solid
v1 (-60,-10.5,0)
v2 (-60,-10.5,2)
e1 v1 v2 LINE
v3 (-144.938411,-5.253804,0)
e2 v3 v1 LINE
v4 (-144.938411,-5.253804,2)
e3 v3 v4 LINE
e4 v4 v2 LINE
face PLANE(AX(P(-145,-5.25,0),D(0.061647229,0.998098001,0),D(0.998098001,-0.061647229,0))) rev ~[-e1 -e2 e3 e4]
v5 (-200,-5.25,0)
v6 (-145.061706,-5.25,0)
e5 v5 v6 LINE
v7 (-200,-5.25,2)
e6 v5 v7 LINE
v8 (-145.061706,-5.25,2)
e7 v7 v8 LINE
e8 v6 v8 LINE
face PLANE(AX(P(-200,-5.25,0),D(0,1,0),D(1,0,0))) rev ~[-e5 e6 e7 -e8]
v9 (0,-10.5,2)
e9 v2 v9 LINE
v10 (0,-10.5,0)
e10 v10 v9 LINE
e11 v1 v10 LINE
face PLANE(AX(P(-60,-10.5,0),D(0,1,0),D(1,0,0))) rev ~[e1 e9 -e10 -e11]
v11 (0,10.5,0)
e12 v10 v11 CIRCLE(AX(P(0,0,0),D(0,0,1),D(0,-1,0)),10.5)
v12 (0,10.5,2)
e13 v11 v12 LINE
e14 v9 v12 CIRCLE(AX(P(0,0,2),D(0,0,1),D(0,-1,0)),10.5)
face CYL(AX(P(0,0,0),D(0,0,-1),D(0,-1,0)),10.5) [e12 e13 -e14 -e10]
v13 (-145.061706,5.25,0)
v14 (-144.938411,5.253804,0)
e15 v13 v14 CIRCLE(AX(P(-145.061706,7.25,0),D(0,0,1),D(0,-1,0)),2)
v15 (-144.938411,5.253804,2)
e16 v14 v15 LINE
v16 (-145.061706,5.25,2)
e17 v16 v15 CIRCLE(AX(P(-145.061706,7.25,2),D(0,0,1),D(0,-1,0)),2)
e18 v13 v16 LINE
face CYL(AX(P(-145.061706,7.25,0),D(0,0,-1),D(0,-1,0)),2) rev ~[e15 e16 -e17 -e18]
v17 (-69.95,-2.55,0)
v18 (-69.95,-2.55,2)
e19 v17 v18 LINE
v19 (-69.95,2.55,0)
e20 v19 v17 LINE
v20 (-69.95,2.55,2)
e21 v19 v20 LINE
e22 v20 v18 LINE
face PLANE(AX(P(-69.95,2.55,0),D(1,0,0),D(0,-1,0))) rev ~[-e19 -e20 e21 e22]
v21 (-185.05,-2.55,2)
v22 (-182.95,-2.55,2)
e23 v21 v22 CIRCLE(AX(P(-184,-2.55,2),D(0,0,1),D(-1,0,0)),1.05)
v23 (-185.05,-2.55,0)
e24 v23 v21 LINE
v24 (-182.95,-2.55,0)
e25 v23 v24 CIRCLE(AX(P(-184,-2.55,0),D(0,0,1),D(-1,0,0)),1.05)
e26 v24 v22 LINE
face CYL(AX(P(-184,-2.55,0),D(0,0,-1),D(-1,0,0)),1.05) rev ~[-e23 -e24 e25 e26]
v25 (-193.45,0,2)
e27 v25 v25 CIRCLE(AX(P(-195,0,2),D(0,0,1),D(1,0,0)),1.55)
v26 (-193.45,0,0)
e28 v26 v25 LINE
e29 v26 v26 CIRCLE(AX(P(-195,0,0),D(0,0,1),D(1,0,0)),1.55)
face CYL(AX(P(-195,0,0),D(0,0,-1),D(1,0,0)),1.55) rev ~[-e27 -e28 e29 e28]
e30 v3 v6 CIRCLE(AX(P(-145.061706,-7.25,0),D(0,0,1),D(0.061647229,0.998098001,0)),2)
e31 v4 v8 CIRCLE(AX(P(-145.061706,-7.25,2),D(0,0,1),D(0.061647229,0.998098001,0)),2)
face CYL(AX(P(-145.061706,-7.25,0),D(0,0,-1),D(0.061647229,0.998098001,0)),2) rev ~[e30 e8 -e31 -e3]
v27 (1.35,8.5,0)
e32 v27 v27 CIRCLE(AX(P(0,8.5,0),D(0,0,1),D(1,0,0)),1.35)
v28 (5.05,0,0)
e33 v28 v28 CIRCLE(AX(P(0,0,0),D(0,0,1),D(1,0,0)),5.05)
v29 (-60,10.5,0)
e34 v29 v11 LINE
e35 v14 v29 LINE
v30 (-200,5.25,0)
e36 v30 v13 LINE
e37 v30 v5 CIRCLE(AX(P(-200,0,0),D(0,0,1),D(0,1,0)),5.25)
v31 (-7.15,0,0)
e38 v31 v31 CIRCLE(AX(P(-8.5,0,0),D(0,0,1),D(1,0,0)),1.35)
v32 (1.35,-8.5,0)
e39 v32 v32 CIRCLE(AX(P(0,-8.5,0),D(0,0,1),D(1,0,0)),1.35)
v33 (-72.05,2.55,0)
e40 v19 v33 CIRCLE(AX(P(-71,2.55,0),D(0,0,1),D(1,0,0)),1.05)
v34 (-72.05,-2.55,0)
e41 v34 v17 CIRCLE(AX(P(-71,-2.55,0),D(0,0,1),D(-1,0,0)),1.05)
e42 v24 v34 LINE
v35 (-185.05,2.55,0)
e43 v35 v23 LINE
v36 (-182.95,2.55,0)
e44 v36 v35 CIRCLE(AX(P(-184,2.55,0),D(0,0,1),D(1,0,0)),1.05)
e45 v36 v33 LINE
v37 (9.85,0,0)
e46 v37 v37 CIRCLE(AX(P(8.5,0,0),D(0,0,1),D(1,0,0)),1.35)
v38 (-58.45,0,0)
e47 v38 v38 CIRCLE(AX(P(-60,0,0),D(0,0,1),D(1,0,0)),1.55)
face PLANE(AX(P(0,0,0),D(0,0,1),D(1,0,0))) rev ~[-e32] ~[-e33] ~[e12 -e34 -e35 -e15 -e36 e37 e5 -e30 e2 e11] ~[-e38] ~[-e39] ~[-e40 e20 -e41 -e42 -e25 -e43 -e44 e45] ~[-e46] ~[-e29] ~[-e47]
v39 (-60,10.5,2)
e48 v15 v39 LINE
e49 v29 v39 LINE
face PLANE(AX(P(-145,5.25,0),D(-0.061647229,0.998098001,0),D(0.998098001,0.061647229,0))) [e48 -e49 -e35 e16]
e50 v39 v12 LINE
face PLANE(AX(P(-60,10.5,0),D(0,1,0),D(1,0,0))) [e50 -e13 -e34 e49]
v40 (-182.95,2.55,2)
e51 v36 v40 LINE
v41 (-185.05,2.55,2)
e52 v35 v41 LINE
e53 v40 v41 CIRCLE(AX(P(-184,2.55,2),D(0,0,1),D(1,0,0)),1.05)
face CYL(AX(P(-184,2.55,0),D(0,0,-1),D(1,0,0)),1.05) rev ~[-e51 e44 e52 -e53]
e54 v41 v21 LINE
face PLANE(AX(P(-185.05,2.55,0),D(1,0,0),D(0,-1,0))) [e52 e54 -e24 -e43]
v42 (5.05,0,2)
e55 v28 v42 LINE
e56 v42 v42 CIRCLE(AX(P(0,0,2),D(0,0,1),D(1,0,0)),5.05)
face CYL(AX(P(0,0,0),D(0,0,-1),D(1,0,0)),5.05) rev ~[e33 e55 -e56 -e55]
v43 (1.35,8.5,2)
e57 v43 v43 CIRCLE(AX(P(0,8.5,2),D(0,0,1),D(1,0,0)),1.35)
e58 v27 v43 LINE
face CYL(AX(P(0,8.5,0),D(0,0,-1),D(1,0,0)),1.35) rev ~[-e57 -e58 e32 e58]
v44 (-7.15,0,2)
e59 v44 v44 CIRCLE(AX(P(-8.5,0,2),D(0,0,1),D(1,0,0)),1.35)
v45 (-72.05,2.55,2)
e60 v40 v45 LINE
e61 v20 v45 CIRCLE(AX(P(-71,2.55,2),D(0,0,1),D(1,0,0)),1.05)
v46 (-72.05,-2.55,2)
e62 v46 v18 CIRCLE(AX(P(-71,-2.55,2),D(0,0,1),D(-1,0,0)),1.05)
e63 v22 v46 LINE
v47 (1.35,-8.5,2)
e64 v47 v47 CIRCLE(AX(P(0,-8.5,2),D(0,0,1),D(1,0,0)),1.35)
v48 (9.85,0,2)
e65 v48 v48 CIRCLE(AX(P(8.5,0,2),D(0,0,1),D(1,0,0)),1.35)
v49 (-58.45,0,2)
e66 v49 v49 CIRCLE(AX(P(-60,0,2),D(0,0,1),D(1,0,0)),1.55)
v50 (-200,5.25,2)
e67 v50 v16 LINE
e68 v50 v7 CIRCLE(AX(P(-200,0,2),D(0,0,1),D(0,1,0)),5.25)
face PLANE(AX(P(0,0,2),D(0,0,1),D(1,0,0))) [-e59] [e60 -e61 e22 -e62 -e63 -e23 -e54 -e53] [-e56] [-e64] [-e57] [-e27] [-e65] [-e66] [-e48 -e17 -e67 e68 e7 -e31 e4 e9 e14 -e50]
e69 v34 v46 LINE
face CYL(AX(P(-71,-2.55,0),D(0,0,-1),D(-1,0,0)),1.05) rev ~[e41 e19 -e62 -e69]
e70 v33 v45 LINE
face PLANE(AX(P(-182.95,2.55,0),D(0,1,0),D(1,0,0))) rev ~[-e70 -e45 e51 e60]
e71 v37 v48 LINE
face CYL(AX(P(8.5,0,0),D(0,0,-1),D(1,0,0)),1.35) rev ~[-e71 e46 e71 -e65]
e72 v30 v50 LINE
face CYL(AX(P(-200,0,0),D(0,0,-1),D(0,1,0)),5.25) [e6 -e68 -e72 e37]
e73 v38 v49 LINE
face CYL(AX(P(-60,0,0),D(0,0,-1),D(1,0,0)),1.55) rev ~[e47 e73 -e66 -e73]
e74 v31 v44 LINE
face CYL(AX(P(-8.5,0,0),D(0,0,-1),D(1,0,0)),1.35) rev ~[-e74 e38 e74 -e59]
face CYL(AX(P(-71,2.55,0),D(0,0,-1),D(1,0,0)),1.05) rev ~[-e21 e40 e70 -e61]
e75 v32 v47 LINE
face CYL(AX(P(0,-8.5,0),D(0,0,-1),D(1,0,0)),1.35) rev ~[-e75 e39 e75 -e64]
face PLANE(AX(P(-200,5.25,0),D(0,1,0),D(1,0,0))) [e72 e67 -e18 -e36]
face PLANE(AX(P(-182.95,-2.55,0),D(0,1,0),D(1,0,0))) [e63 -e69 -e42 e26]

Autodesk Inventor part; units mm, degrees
ref_plane "YZ Plane" through (0, 0, 0) normal (1, 0, 0) x (0, 1, 0)
ref_plane "XZ Plane" through (0, 0, 0) normal (0, 1, 0) x (-1, 0, 0)
ref_plane "XY Plane" through (0, 0, 0) normal (0, 0, 1) x (1, 0, 0)
sketch "スケッチ1" plane through (0, 0, 0) normal (0, 0, 1) x (1, 0, 0)
  circle A0 centre (0, 0) radius 10.5 construction
  line L0 (0, 10.5) -> (-200, 10.5) construction
  line L1 (-200, 10.5) -> (-200, -10.5) construction
  line L2 (-200, -10.5) -> (0, -10.5) construction
  circle A1 centre (-195, 0) radius 1.55
  line L3 (-185, 2.5) -> (-70, 2.5) construction
  line L4 (-70, 2.5) -> (-70, -2.5) construction
  line L5 (-70, -2.5) -> (-185, -2.5) construction
  line L6 (-185, -2.5) -> (-185, 2.5) construction
  line L7 (-127.5, 2.5) -> (-127.5, -2.5) construction
  circle A2 centre (-60, 0) radius 1.55
  line L8 (-12, 21.3027) -> (-12, -27.3903) construction
  line L9 (-69.95, 2.55) -> (-185.05, 2.55) construction
  line L10 (-185.05, 2.55) -> (-185.05, -2.55) construction
  line L11 (-185.05, -2.55) -> (-69.95, -2.55) construction
  line L12 (-69.95, -2.55) -> (-69.95, 2.55) construction
  circle A3 centre (-184, 2.55) radius 1.05 construction
  line L13 (-185, 0) -> (-127.5, 0) construction
  line L14 (-185.05, 2.55) -> (-185.05, -2.55)
  arc A4 (-182.95, 2.55) -> (-185.05, 2.55) centre (-184, 2.55) ccw
  line L15 (-182.95, 2.55) -> (-72.05, 2.55)
  arc A5 (-69.95, 2.55) -> (-72.05, 2.55) centre (-71, 2.55) ccw
  line L16 (-69.95, 2.55) -> (-69.95, -2.55)
  arc A6 (-185.05, -2.55) -> (-182.95, -2.55) centre (-184, -2.55) ccw
  line L17 (-182.95, -2.55) -> (-72.05, -2.55)
  arc A7 (-72.05, -2.55) -> (-69.95, -2.55) centre (-71, -2.55) ccw
  circle A8 centre (0, 8.5) radius 1.35
  circle A9 centre (0, 0) radius 5.05
  circle A10 centre (-8.5, 0) radius 1.35
  circle A11 centre (0, -8.5) radius 1.35
  circle A12 centre (8.5, 0) radius 1.35
  line L18 (-60, 10.5) -> (0, 10.5)
  line L19 (-60, -10.5) -> (0, -10.5)
  arc A13 (0, -10.5) -> (0, 10.5) centre (0, 0) ccw
  circle A14 centre (-195, 0) radius 5 construction
  arc A15 (-200, 5.25) -> (-200, -5.25) centre (-200, 0) ccw
  line L20 (-200, 5.25) -> (-145, 5.25)
  line L21 (-145, 5.25) -> (-60, 10.5)
  line L22 (-200, -5.25) -> (-145, -5.25)
  line L23 (-145, -5.25) -> (-60, -10.5)
  dimension "d9" = 2.1
  dimension "d0" = 200
  dimension "d1" = 3.1
  dimension "d2" = 21
  dimension "d3" = 10
  dimension "d4" = 5
  dimension "d5" = 12
  dimension "d6" = 135
  dimension "d7" = 5
  dimension "d8" = 0.05
  dimension "d10" = 2.7
  dimension "d11" = 8.5
  dimension "d12" = 10.1
  dimension "d15" = 360
  dimension "d20" = 5.25
  dimension "d21" = 50
extrude "押し出し1" add sketch "スケッチ1" along normal blind 2
fillet "フィレット1" radius 2 2 edges at (-145, -5.25, 1) (-145, 5.25, 1)
equation "\"H_head\" = 28.5"
equation "\"H_leg\" = 199.5"
equation "\"足の面積\" = 12720.125"
equation "\"現在の面積\" = 11560"
equation "\"足_短辺\" = 68"
equation "\"円柱\" = 313.5"
equation "\"胴体中心から手先\" = 342"
equation "\"H_leg_1\" = 186.2"
equation "\"H_leg_MAX\" = 399"
equation "\"H_head_1\" = 26.6"
equation "\"H_head_MAX\" = 142.5"
properties part number "ForeArm_outside_frame" material "GFRP"
